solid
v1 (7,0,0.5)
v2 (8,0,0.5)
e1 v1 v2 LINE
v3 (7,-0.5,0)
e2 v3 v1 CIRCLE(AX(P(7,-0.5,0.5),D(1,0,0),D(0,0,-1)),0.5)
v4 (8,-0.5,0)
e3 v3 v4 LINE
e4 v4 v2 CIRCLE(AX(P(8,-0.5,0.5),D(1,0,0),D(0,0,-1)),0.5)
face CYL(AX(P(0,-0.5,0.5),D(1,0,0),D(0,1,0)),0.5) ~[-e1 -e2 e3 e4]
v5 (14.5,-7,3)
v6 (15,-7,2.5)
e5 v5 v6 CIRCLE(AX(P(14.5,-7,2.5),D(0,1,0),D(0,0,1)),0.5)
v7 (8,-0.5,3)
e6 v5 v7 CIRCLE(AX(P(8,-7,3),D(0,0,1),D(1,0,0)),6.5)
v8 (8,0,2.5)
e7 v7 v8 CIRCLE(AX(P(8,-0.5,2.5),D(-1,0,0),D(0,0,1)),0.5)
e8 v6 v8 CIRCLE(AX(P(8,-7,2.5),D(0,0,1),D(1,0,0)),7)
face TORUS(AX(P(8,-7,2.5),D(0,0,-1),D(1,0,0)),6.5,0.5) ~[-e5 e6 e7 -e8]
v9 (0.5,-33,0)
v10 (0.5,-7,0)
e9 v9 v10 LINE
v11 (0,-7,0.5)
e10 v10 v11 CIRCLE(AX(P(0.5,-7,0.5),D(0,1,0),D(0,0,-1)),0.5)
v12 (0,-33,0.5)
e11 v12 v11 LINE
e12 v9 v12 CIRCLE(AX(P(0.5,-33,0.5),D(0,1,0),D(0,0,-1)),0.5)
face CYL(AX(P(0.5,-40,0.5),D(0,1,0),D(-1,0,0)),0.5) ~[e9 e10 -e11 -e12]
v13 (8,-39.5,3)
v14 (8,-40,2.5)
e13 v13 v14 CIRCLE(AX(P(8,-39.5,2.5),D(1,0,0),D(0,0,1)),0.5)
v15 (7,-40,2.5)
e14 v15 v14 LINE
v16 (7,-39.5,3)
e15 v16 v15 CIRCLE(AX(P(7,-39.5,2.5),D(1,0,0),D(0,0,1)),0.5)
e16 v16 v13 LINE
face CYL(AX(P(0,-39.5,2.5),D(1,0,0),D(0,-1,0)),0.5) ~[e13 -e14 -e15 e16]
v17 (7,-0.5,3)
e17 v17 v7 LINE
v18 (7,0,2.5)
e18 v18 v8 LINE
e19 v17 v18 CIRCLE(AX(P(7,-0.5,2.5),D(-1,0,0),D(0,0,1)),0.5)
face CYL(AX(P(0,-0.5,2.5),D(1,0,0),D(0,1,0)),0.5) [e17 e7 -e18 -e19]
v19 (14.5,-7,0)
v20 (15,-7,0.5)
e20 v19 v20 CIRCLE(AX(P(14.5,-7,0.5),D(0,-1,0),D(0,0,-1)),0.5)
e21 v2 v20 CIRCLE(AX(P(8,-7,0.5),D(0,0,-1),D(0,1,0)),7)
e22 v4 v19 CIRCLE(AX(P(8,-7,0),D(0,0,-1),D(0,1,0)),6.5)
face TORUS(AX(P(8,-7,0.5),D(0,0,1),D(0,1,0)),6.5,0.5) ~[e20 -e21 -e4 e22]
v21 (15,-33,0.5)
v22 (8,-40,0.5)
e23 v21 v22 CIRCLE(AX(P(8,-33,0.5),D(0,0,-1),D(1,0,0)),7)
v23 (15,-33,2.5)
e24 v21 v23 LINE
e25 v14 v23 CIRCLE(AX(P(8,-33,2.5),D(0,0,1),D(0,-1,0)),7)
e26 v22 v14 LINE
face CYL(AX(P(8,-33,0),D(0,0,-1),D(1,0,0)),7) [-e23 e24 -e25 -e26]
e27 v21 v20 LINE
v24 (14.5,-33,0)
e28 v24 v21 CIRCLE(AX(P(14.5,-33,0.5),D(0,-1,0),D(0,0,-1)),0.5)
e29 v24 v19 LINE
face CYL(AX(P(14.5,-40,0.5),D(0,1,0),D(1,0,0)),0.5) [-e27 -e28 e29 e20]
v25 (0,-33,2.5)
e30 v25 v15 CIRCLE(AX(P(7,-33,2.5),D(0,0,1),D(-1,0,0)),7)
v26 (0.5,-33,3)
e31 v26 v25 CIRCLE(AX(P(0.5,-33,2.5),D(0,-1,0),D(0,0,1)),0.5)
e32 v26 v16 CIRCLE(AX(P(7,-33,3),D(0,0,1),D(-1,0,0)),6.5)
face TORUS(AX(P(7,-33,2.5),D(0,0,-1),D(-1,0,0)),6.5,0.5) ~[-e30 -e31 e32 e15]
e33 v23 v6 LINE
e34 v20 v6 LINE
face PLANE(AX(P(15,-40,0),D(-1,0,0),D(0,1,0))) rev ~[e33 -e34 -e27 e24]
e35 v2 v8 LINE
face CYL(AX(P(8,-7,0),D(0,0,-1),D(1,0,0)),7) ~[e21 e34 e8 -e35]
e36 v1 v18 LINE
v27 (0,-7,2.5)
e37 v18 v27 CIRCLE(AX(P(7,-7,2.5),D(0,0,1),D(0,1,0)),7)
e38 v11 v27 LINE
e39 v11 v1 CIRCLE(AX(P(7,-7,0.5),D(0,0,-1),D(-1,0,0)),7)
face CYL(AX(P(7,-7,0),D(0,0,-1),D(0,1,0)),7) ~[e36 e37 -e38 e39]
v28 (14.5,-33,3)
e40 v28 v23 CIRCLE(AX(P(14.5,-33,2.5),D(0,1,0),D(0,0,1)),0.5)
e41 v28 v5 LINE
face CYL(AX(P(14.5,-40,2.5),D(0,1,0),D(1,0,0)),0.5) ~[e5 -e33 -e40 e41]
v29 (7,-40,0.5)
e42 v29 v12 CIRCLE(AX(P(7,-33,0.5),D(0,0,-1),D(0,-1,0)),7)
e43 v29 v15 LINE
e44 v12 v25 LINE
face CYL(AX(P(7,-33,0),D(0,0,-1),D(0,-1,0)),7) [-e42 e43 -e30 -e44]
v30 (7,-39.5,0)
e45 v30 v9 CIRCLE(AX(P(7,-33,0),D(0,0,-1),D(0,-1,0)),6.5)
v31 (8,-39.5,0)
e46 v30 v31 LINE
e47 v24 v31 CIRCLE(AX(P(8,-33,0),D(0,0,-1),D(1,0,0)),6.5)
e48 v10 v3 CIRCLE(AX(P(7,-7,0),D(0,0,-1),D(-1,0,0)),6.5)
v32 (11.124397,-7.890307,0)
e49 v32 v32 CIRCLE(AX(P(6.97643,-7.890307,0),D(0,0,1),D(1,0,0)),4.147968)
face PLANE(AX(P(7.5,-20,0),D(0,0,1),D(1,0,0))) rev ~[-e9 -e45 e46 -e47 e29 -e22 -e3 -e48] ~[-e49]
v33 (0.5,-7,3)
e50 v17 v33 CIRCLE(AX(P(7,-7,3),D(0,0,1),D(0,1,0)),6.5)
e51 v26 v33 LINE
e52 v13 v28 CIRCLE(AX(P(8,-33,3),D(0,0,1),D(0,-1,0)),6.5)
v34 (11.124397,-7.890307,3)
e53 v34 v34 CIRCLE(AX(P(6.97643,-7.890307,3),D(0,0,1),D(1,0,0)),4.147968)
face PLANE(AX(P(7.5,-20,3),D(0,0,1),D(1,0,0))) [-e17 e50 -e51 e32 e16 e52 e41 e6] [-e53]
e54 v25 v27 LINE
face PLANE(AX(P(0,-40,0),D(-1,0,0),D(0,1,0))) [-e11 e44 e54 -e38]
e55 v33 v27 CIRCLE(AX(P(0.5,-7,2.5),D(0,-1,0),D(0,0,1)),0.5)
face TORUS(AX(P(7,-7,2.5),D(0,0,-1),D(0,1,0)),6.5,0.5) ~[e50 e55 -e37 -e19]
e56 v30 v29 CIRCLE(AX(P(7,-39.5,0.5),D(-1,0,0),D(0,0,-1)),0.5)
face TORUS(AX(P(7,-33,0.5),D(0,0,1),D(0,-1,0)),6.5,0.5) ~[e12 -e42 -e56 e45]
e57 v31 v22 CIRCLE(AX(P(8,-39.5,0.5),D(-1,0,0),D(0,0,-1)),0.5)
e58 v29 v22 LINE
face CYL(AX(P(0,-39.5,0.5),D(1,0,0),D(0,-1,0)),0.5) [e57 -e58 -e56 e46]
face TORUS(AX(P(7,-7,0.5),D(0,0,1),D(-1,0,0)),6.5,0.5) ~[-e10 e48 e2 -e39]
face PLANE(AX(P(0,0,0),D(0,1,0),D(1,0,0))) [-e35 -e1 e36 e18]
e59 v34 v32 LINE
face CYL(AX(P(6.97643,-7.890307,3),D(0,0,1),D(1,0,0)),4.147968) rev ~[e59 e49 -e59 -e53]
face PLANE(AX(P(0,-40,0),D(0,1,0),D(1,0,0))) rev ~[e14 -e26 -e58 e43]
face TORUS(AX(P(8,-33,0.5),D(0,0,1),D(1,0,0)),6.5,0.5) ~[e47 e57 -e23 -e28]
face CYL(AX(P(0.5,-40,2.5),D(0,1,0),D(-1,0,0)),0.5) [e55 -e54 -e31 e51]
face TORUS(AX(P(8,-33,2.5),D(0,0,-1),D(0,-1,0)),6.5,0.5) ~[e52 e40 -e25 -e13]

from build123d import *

# Parameters (mm, degrees)
F0_W         = 15
F0_H         = 40
F1_DEPTH     = 3
F2_R         = 0.5
F3_T1_DEPTH  = 3
F3_T4_ANGLE  = 90
F3_T6_ANGLE  = 90
F3_T8_ANGLE  = 90
F3_T10_ANGLE = 90
F3_T12_ANGLE = 90
F3_T14_ANGLE = 90
F3_T16_ANGLE = 90
F3_T18_ANGLE = 90
F4_R         = 4.1479676184
F5_DEPTH     = 25


# Not quite as in the source:
# - a fillet or chamfer that OpenCascade refuses, or shapes differently, is made with other operations: its cross-section is extruded or revolved along the edge and cut away or added


with BuildPart() as f1:
    # F0 (on Top) → F1 (new body)
    with BuildSketch(Plane.XY):
        with Locations((7.5, -20)):
            Rectangle(F0_W, F0_H)
    extrude(amount=F1_DEPTH)

    # F2
    f2_edges = [f1.edges().sort_by_distance(p)[0] for p in [
        (15, -20, 3),
        (7.5, 0, 3),
        (0, -20, 3),
        (7.5, -40, 3),
        (15, -20, 0),
        (7.5, 0, 0),
        (0, -20, 0),
        (7.5, -40, 0),
    ]]
    fillet(f2_edges, radius=F2_R)

    # F3: fillet of radius 7 on 4 edges, made by hand

    # F3_s2 → F3_t1 (cut)
    with BuildSketch(Plane.XY):
        with BuildLine():
            ThreePointArc((15, -7), (12.9497474683, -2.0502525317), (8, 0))
            Line((8, 0), (15, 0))
            Line((15, 0), (15, -7))
        make_face()
        with BuildLine():
            ThreePointArc((7, 0), (2.0502525317, -2.0502525317), (0, -7))
            Line((0, -7), (0, 0))
            Line((0, 0), (7, 0))
        make_face()
        with BuildLine():
            ThreePointArc((15, -33), (12.9497474683, -37.9497474683), (8, -40))
            Line((8, -40), (15, -40))
            Line((15, -40), (15, -33))
        make_face()
        with BuildLine():
            ThreePointArc((7, -40), (2.0502525317, -37.9497474683), (0, -33))
            Line((0, -33), (0, -40))
            Line((0, -40), (7, -40))
        make_face()
    extrude(amount=F3_T1_DEPTH, mode=Mode.SUBTRACT)

    # F3_s3 → F3_t4 (revolve, cut)
    with BuildSketch(Plane.YZ.offset(7)):
        with BuildLine():
            ThreePointArc((-39.5, 0), (-39.8535533906, 0.1464466094), (-40, 0.5))
            Line((-40, 0.5), (-40, 0))
            Line((-40, 0), (-39.5, 0))
        make_face()
    revolve(axis=Axis((7, -33, 0), (0, 0, -1)), revolution_arc=F3_T4_ANGLE, mode=Mode.SUBTRACT)

    # F3_s5 → F3_t6 (revolve, cut)
    with BuildSketch(Plane.XZ.offset(33)):
        with BuildLine():
            ThreePointArc((0.5, 3), (0.1464466094, 2.8535533906), (0, 2.5))
            Line((0, 2.5), (0, 3))
            Line((0, 3), (0.5, 3))
        make_face()
    revolve(axis=Axis((7, -33, 3), (0, 0, 1)), revolution_arc=F3_T6_ANGLE, mode=Mode.SUBTRACT)

    # F3_s7 → F3_t8 (revolve, cut)
    with BuildSketch(Plane.XZ.offset(33)):
        with BuildLine():
            ThreePointArc((14.5, 0), (14.8535533906, 0.1464466094), (15, 0.5))
            Line((15, 0.5), (15, 0))
            Line((15, 0), (14.5, 0))
        make_face()
    revolve(axis=Axis((8, -33, 0), (0, 0, -1)), revolution_arc=F3_T8_ANGLE, mode=Mode.SUBTRACT)

    # F3_s9 → F3_t10 (revolve, cut)
    with BuildSketch(Plane.YZ.offset(8)):
        with BuildLine():
            ThreePointArc((-39.5, 3), (-39.8535533906, 2.8535533906), (-40, 2.5))
            Line((-40, 2.5), (-40, 3))
            Line((-40, 3), (-39.5, 3))
        make_face()
    revolve(axis=Axis((8, -33, 3), (0, 0, 1)), revolution_arc=F3_T10_ANGLE, mode=Mode.SUBTRACT)

    # F3_s11 → F3_t12 (revolve, cut)
    with BuildSketch(Plane.XZ.offset(7)):
        with BuildLine():
            ThreePointArc((0.5, 0), (0.1464466094, 0.1464466094), (0, 0.5))
            Line((0, 0.5), (0, 0))
            Line((0, 0), (0.5, 0))
        make_face()
    revolve(axis=Axis((7, -7, 0), (0, 0, -1)), revolution_arc=F3_T12_ANGLE, mode=Mode.SUBTRACT)

    # F3_s13 → F3_t14 (revolve, cut)
    with BuildSketch(Plane.YZ.offset(7)):
        with BuildLine():
            ThreePointArc((-0.5, 3), (-0.1464466094, 2.8535533906), (0, 2.5))
            Line((0, 2.5), (0, 3))
            Line((0, 3), (-0.5, 3))
        make_face()
    revolve(axis=Axis((7, -7, 3), (0, 0, 1)), revolution_arc=F3_T14_ANGLE, mode=Mode.SUBTRACT)

    # F3_s15 → F3_t16 (revolve, cut)
    with BuildSketch(Plane.YZ.offset(8)):
        with BuildLine():
            ThreePointArc((-0.5, 0), (-0.1464466094, 0.1464466094), (0, 0.5))
            Line((0, 0.5), (0, 0))
            Line((0, 0), (-0.5, 0))
        make_face()
    revolve(axis=Axis((8, -7, 0), (0, 0, -1)), revolution_arc=F3_T16_ANGLE, mode=Mode.SUBTRACT)

    # F3_s17 → F3_t18 (revolve, cut)
    with BuildSketch(Plane.XZ.offset(7)):
        with BuildLine():
            ThreePointArc((14.5, 3), (14.8535533906, 2.8535533906), (15, 2.5))
            Line((15, 2.5), (15, 3))
            Line((15, 3), (14.5, 3))
        make_face()
    revolve(axis=Axis((8, -7, 3), (0, 0, 1)), revolution_arc=F3_T18_ANGLE, mode=Mode.SUBTRACT)

    # F4 (on face) → F5 (cut)
    with BuildSketch(Plane.XY.offset(3)):
        with Locations((6.9764298387, -7.8903073445)):
            Circle(F4_R)
    extrude(amount=-F5_DEPTH, mode=Mode.SUBTRACT)


solid = f1.part
